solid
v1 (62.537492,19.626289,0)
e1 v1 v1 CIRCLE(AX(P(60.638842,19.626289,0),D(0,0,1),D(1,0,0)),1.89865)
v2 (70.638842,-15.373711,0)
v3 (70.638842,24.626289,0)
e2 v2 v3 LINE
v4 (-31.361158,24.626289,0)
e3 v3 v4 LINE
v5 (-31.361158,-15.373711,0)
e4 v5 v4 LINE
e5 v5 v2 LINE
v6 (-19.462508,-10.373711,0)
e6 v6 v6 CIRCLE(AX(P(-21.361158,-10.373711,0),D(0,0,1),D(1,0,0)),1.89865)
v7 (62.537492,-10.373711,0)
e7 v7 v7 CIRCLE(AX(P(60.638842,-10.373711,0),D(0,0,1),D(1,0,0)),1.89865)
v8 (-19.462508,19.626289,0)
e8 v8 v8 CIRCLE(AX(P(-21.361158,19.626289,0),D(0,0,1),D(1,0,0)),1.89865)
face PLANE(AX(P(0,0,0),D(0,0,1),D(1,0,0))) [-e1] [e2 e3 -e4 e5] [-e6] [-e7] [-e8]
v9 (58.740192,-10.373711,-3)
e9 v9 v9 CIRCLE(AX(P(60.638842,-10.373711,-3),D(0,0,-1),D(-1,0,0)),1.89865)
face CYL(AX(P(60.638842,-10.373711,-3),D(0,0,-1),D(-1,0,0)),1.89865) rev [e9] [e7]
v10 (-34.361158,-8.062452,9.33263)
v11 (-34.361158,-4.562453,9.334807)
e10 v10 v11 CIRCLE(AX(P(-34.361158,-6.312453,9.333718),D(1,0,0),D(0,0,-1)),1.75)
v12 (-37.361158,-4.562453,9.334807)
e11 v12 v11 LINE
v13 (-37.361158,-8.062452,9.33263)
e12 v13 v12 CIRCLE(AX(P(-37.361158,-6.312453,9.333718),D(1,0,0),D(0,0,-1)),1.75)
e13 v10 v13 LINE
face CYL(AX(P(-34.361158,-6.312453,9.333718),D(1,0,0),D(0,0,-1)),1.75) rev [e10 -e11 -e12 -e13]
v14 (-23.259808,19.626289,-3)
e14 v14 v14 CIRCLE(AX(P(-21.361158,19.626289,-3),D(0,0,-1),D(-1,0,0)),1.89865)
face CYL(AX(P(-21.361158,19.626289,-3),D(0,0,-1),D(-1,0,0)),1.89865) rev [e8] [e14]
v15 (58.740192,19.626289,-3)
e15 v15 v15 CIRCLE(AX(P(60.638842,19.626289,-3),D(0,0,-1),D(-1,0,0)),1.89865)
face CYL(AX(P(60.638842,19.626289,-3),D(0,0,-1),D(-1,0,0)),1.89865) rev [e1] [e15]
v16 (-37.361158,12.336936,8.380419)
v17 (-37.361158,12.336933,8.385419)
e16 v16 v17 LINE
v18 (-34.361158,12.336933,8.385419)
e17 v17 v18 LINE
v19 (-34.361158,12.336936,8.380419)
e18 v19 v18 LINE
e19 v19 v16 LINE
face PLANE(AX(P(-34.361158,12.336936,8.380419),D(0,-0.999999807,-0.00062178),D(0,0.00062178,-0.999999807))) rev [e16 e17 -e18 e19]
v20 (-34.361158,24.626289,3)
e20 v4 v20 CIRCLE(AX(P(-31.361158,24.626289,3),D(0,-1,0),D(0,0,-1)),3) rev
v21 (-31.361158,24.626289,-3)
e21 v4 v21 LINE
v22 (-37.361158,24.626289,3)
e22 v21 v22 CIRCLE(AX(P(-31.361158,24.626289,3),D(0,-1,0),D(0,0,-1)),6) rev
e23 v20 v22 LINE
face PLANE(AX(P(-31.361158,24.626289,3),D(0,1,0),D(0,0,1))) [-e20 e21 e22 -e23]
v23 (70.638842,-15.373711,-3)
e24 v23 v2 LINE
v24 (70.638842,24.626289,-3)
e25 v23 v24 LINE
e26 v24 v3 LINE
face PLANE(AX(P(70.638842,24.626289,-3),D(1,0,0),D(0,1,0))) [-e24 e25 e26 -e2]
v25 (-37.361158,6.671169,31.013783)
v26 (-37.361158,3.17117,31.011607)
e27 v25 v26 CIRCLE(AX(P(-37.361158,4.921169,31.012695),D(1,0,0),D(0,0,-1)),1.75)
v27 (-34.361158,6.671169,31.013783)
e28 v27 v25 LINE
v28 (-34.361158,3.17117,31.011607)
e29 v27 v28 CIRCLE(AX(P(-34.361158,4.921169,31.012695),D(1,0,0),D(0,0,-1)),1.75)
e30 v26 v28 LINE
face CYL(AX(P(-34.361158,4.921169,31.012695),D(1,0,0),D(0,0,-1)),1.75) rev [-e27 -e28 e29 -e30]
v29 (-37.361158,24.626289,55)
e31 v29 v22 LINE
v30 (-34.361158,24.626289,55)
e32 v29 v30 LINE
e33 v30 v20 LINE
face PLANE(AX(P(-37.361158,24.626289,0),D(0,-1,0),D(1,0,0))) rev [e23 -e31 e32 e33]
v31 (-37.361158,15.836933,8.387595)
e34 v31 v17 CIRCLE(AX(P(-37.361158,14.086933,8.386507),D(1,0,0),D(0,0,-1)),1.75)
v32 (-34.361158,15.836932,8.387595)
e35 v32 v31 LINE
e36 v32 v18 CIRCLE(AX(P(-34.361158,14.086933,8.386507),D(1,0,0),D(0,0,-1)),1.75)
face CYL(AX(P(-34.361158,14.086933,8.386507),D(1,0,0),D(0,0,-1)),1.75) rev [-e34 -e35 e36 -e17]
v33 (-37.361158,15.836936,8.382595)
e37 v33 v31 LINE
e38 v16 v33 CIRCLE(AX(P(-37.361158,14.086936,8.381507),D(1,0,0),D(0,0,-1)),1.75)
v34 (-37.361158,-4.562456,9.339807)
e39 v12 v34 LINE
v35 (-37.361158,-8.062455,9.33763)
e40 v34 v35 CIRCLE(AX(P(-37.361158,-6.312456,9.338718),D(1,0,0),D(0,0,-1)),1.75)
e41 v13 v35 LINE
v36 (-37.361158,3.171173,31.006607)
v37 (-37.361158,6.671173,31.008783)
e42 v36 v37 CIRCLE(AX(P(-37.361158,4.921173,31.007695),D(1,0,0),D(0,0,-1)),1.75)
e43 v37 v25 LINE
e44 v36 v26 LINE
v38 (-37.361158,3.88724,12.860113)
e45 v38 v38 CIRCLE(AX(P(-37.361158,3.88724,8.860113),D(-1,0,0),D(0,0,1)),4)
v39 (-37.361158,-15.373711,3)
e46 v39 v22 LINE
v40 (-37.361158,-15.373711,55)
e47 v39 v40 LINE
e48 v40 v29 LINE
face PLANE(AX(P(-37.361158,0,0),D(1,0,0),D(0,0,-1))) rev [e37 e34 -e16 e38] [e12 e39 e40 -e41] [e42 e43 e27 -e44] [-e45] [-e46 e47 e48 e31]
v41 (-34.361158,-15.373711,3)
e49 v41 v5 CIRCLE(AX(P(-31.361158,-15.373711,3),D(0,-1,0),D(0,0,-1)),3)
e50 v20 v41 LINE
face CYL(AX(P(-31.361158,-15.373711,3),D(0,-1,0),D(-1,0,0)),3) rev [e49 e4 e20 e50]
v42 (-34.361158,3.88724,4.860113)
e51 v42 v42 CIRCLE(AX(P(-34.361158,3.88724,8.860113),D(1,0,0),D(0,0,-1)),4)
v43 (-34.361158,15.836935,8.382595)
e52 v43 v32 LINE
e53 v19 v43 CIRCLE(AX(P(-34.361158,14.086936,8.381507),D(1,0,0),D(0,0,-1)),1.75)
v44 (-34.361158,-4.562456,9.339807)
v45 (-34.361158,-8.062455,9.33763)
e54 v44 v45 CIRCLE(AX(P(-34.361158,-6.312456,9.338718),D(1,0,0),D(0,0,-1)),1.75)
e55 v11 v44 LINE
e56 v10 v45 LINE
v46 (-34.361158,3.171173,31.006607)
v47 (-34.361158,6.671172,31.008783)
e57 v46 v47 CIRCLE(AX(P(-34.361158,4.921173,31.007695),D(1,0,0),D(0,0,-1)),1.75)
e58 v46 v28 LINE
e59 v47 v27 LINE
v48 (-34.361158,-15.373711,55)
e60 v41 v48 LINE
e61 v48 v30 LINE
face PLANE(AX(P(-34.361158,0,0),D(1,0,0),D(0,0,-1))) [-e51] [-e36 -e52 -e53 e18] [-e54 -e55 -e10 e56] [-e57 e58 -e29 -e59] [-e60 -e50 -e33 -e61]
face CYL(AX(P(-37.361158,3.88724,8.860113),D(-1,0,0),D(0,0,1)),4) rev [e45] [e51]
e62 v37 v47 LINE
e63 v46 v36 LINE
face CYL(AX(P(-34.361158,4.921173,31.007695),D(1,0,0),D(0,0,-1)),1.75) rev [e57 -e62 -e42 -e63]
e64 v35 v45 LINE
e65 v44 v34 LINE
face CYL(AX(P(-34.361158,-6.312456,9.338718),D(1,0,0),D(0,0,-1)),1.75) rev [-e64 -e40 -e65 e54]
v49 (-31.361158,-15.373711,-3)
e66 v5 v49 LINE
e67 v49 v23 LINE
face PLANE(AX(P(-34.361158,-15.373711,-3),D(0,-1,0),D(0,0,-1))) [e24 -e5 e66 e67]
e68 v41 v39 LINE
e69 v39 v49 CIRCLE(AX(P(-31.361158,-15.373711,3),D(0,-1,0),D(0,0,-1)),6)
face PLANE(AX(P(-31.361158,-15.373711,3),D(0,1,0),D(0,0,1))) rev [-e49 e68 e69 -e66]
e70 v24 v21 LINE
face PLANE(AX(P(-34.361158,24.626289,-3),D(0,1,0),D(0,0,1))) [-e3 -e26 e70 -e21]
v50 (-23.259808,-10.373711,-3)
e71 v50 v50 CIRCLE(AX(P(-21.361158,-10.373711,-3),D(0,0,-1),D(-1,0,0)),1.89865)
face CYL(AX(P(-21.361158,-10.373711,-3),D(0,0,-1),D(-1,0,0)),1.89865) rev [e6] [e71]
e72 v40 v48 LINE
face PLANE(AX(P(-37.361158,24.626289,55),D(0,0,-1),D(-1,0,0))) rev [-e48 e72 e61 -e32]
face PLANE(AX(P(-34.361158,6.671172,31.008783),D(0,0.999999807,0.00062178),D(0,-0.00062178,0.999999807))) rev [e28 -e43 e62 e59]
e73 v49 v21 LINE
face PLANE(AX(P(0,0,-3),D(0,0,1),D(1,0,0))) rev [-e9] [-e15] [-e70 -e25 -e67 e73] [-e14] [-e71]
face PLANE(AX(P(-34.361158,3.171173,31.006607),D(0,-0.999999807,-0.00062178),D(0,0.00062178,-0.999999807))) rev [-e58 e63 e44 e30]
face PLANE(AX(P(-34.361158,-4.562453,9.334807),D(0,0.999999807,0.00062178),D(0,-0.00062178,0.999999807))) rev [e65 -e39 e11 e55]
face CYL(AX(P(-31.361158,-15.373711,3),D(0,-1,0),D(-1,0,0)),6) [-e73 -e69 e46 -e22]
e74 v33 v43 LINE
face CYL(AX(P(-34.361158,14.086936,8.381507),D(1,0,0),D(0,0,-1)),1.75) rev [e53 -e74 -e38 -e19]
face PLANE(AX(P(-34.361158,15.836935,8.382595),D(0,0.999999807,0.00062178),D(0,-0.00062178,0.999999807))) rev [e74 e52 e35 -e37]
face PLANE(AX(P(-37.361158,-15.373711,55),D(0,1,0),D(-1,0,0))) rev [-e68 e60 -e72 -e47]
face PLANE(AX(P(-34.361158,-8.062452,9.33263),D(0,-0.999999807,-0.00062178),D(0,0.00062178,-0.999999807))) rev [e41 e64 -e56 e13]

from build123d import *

# Parameters (mm, degrees)
SKETCH1_W                    = 105
SKETCH1_H                    = 40
BASE_FLANGE1_DEPTH           = 3
EDGE_FLANGE1_STRIP_W         = 18
EDGE_FLANGE1_STRIP_H         = 3
EDGE_FLANGE1_STRIP_CUT_DEPTH = 40
EDGE_FLANGE1_DEPTH           = 40
F_25_0_1495_DIAMETER_SLOT1_D = 3.7973
F_3_0MM_START                = -37.361157767
F_3_0MM_DOWEL_SLOT1_DEPTH    = 3
F_3_0MM_DOWEL_SLOT2_D        = 8


# Read off the part's stored shape, not the designer's step: Ø3.0mm Dowel Slot1
# Sheet-metal steps are written as plain solids
with BuildPart() as part:
    # Sketch1 → Base-Flange1 (new body)
    with BuildSketch(Plane.XY):
        with Locations((18.138842233, 4.62628866)):
            Rectangle(SKETCH1_W, SKETCH1_H)
    extrude(amount=-BASE_FLANGE1_DEPTH)

    # Edge-Flange1 strip (across the edge) → Edge-Flange1 strip cut (cut)
    with BuildSketch(Plane(origin=(-34.361157767, 24.62628866, 0), x_dir=(1, 0, 0), z_dir=(0, -1, 0))):
        with Locations((-6, -1.5)):
            Rectangle(EDGE_FLANGE1_STRIP_W, EDGE_FLANGE1_STRIP_H)
    extrude(amount=EDGE_FLANGE1_STRIP_CUT_DEPTH, mode=Mode.SUBTRACT)

    # Edge-Flange1 section (across the edge) → Edge-Flange1 (add)
    with BuildSketch(Plane(origin=(-34.361157767, 24.62628866, 0), x_dir=(1, 0, 0), z_dir=(0, -1, 0))):
        with BuildLine():
            Line((-3, 3), (-3, 55))
            Line((-3, 55), (0, 55))
            Line((0, 55), (0, 3))
            ThreePointArc((0, 3), (0.878679656, 0.878679656), (3, 0))
            Line((3, 0), (3, -3))
            ThreePointArc((3, -3), (-1.242640687, -1.242640687), (-3, 3))
        make_face()
    extrude(amount=EDGE_FLANGE1_DEPTH)

    # #25 (0.1495) Diameter Slot1 (through all)
    with Locations(Plane(origin=(0, 0, -3), x_dir=(-1, 0, 0), z_dir=(0, 0, -1))):
        with Locations((-60.638842233, 19.62628866), (-60.638842233, -10.37371134), (21.361157767, -10.37371134), (21.361157767, 19.62628866)):
            Hole(F_25_0_1495_DIAMETER_SLOT1_D / 2)

    # Ø3.0mm Dowel Slot1 outline → Ø3.0mm Dowel Slot1 (cut)
    with BuildSketch(Plane.YZ.offset(F_3_0MM_START)):
        with BuildLine():
            Line((6.67117218, 31.008782935), (6.671169071, 31.013782934))
            ThreePointArc((6.671169071, 31.013782934), (4.920081294, 32.762694482), (3.171169747, 31.011606705))
            Line((3.171169747, 31.011606705), (3.171172856, 31.006606706))
            ThreePointArc((3.171172856, 31.006606706), (4.922260632, 29.257695159), (6.67117218, 31.008782935))
        make_face()
        with BuildLine():
            Line((-4.562452858, 9.334806586), (-4.562455966, 9.339806585))
            ThreePointArc((-4.562455966, 9.339806585), (-6.313543742, 11.088718132), (-8.06245529, 9.337630356))
            Line((-8.06245529, 9.337630356), (-8.062452181, 9.332630357))
            ThreePointArc((-8.062452181, 9.332630357), (-6.311364405, 7.583718809), (-4.562452858, 9.334806586))
        make_face()
        with BuildLine():
            Line((15.836935374, 8.38259529), (15.836932265, 8.387595289))
            ThreePointArc((15.836932265, 8.387595289), (14.085844489, 10.136506836), (12.336932941, 8.38541906))
            Line((12.336932941, 8.38541906), (12.33693605, 8.380419061))
            ThreePointArc((12.33693605, 8.380419061), (14.088023826, 6.631507514), (15.836935374, 8.38259529))
        make_face()
    extrude(amount=F_3_0MM_DOWEL_SLOT1_DEPTH, mode=Mode.SUBTRACT)

    # Ø3.0mm Dowel Slot2 (through all)
    with Locations(Plane.ZY.offset(37.361157767)):
        with Locations((8.860112823, 3.887240042)):
            Hole(F_3_0MM_DOWEL_SLOT2_D / 2)


solid = part.part
